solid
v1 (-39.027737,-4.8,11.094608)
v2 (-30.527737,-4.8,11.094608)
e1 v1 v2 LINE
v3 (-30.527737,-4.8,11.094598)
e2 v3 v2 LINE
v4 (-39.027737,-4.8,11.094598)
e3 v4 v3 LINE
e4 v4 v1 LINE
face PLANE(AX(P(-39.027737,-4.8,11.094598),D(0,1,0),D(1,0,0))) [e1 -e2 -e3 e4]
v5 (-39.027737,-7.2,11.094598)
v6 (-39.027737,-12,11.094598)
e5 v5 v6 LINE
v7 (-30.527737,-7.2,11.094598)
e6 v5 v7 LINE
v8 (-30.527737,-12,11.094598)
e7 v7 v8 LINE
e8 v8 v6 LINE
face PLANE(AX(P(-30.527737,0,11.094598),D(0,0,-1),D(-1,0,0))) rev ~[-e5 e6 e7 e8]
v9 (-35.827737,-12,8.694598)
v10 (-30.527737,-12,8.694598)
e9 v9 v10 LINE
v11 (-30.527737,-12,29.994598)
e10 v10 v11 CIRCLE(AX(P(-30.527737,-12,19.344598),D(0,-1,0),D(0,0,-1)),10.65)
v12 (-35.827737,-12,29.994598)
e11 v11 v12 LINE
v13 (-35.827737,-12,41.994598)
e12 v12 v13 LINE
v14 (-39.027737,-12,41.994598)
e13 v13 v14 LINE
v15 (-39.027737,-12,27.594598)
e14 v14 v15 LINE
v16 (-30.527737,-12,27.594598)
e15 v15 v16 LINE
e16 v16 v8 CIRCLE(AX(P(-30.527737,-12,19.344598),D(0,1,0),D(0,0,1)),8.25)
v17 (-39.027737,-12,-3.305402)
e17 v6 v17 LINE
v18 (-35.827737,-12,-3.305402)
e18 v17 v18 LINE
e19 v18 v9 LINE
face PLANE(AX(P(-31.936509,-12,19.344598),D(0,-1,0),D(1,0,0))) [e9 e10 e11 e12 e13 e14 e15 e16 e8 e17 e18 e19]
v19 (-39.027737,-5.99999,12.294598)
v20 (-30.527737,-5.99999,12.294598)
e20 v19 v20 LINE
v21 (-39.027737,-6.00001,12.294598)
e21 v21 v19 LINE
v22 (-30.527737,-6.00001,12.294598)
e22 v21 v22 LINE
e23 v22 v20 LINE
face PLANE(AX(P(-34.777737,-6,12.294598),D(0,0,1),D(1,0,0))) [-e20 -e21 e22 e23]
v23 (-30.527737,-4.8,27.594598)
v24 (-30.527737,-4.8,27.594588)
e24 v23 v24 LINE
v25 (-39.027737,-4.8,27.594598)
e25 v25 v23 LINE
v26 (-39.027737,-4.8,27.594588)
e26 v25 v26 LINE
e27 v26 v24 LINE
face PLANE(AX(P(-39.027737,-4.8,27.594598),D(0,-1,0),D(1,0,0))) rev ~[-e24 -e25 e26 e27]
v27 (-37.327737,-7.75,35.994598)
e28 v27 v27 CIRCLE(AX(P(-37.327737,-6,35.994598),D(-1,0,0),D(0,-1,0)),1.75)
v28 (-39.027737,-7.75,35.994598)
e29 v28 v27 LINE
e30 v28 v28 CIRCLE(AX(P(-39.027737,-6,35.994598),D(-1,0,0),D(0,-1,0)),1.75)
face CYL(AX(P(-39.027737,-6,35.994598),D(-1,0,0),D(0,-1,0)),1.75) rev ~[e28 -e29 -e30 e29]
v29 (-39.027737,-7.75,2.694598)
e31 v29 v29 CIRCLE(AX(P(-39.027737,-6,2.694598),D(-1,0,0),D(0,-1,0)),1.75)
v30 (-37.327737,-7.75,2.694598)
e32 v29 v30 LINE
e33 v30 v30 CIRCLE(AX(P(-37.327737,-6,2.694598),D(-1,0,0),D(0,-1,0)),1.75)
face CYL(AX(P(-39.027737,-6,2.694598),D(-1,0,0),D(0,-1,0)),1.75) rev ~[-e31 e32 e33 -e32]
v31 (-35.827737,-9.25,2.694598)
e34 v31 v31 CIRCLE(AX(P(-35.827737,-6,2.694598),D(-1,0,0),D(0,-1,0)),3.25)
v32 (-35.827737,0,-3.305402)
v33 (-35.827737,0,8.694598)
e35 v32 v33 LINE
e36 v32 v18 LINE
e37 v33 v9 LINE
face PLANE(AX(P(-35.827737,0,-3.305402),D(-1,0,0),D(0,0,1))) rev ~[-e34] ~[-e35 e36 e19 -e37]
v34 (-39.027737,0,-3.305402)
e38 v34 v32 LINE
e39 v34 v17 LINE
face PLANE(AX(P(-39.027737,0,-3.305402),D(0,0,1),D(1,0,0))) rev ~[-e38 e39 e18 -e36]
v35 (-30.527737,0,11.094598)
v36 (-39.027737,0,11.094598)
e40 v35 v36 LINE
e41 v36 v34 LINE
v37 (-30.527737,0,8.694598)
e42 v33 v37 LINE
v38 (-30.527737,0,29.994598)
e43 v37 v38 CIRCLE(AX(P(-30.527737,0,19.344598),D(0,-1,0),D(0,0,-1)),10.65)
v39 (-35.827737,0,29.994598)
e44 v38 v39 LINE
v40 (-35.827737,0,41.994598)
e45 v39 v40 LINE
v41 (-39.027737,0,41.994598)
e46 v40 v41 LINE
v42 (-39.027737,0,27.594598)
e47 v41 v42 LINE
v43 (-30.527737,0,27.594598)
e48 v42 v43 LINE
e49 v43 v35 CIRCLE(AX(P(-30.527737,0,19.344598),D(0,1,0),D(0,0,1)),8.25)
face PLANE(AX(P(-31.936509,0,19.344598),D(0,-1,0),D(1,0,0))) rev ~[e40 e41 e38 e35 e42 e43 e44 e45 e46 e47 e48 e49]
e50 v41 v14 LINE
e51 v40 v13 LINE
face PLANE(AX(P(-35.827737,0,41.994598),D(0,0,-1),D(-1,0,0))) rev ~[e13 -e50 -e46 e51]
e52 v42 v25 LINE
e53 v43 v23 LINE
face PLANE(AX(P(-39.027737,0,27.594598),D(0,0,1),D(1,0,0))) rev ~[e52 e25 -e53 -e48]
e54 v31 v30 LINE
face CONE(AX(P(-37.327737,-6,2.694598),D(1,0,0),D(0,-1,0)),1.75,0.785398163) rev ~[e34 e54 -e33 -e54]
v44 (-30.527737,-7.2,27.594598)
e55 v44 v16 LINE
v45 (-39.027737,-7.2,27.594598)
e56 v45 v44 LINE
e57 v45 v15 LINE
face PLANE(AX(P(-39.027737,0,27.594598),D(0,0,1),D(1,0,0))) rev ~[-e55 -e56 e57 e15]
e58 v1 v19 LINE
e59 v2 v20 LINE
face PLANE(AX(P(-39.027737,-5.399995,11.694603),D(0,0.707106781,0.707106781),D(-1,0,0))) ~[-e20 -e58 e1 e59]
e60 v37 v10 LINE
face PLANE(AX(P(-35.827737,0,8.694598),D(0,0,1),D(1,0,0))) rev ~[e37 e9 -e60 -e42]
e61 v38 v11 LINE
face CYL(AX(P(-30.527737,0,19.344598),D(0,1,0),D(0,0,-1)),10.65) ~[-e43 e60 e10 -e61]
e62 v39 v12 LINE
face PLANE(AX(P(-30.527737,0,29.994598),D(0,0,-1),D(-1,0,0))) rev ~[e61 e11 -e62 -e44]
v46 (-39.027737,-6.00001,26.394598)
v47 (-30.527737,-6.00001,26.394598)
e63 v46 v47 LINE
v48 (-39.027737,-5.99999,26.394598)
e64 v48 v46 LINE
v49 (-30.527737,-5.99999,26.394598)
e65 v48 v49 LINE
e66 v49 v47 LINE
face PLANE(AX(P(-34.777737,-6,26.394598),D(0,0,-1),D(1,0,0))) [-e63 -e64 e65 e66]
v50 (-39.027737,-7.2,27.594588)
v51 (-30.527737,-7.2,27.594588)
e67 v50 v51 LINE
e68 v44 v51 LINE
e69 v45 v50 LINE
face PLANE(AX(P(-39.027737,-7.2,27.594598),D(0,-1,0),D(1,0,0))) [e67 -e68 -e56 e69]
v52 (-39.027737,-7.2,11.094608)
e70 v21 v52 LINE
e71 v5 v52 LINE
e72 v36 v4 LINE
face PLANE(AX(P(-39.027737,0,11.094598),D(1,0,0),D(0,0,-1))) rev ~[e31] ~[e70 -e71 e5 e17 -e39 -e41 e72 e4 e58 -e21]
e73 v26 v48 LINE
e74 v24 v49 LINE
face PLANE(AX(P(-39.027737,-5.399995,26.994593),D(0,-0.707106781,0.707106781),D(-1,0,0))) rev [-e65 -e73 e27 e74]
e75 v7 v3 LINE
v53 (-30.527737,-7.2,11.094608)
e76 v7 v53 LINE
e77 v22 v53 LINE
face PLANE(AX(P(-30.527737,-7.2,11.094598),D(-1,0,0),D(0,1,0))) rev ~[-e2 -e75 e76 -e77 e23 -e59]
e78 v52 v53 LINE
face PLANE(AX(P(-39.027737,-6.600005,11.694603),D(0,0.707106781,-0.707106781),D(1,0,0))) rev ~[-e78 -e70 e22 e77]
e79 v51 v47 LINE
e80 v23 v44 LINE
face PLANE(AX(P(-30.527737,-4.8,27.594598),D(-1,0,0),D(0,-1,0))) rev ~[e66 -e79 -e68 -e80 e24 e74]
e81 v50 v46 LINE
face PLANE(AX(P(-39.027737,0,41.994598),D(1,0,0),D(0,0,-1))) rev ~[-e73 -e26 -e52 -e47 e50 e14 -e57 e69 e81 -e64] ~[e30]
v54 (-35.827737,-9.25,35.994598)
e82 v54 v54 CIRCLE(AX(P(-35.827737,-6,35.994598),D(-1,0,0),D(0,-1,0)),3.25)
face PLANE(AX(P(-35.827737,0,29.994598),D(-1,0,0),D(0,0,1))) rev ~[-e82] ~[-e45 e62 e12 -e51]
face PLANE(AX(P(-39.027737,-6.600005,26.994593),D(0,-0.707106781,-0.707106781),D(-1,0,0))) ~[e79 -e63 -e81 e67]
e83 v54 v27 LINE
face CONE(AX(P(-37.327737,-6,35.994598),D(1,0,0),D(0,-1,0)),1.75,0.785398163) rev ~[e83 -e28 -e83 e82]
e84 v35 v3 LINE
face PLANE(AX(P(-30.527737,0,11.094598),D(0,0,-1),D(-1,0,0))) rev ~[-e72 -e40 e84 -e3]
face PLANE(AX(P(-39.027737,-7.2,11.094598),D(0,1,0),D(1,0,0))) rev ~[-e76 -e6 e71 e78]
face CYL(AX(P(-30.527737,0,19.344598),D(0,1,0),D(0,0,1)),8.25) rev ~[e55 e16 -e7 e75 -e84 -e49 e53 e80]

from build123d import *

# Parameters (mm, degrees)
F1_DEPTH = 12
F2_R     = 1.75
F3_DEPTH = 19.151
F4_SIZE  = 1.5
F5_W     = 8.5
F5_H     = 2.4
F6_DEPTH = 1.2
F7_W     = 8.5
F7_H     = 2.4
F8_DEPTH = 1.2
F9_SIZE  = 1.19999


# Not quite as in the source:
# - a fillet or chamfer is up to 0.001 mm smaller than in the source, because OpenCascade refuses the exact size


with BuildPart() as f1:
    # F0 (on Front) → F1 (new body)
    with BuildSketch(Plane.XZ):
        with BuildLine():
            Line((-35.8277369916, 41.9945976296), (-39.0277369916, 41.9945976296))
            Line((-39.0277369916, 41.9945976296), (-39.0277369916, 27.5945976296))
            Line((-39.0277369916, 27.5945976296), (-30.5277369916, 27.5945976296))
            ThreePointArc((-30.5277369916, 27.5945976296), (-22.2777369916, 19.3445976296), (-30.5277369916, 11.0945976296))
            Line((-30.5277369916, 11.0945976296), (-39.0277369916, 11.0945976296))
            Line((-39.0277369916, 11.0945976296), (-39.0277369916, -3.3054023704))
            Line((-39.0277369916, -3.3054023704), (-35.8277369916, -3.3054023704))
            Line((-35.8277369916, -3.3054023704), (-35.8277369916, 8.6945976296))
            Line((-35.8277369916, 8.6945976296), (-30.5277369916, 8.6945976296))
            ThreePointArc((-30.5277369916, 8.6945976296), (-19.8777369916, 19.3445976296), (-30.5277369916, 29.9945976296))
            Line((-30.5277369916, 29.9945976296), (-35.8277369916, 29.9945976296))
            Line((-35.8277369916, 29.9945976296), (-35.8277369916, 41.9945976296))
        make_face()
    extrude(amount=F1_DEPTH)

    # F2 (on face) → F3 (cut, through all)
    with BuildSketch(Plane(origin=(-39.0277369916, 0, 0), x_dir=(0, -1, 0), z_dir=(-1, 0, 0))):
        with Locations((6, 35.9945976296)):
            Circle(F2_R)
        with Locations((6, 2.6945976296)):
            Circle(F2_R)
    extrude(amount=-F3_DEPTH, mode=Mode.SUBTRACT)

    # F4
    f4_edges = [f1.edges().sort_by_distance(p)[0] for p in [
        (-35.827737, -4.25, 35.994598),
        (-35.827737, -4.25, 2.694598),
    ]]
    chamfer(f4_edges, length=F4_SIZE)

    # F5 (on face) → F6 (join)
    with BuildSketch(Plane.XY.offset(11.0945976296)):
        with Locations((-34.7777369916, -6)):
            Rectangle(F5_W, F5_H)
    extrude(amount=F6_DEPTH)

    # F7 (on face) → F8 (join)
    with BuildSketch(Plane(origin=(0, 0, 27.5945976296), x_dir=(1, 0, 0), z_dir=(0, 0, -1))):
        with Locations((-34.7777369916, 6)):
            Rectangle(F7_W, F7_H)
    extrude(amount=F8_DEPTH)

    # F9 (size 1.2 in the source; OpenCascade refuses exactly that, so slightly less here)
    f9_edges = [f1.edges().sort_by_distance(p)[0] for p in [
        (-34.777737, -7.2, 12.294598),
        (-34.777737, -4.8, 12.294598),
        (-34.777737, -7.2, 26.394598),
        (-34.777737, -4.8, 26.394598),
    ]]
    chamfer(f9_edges, length=F9_SIZE)


solid = f1.part
